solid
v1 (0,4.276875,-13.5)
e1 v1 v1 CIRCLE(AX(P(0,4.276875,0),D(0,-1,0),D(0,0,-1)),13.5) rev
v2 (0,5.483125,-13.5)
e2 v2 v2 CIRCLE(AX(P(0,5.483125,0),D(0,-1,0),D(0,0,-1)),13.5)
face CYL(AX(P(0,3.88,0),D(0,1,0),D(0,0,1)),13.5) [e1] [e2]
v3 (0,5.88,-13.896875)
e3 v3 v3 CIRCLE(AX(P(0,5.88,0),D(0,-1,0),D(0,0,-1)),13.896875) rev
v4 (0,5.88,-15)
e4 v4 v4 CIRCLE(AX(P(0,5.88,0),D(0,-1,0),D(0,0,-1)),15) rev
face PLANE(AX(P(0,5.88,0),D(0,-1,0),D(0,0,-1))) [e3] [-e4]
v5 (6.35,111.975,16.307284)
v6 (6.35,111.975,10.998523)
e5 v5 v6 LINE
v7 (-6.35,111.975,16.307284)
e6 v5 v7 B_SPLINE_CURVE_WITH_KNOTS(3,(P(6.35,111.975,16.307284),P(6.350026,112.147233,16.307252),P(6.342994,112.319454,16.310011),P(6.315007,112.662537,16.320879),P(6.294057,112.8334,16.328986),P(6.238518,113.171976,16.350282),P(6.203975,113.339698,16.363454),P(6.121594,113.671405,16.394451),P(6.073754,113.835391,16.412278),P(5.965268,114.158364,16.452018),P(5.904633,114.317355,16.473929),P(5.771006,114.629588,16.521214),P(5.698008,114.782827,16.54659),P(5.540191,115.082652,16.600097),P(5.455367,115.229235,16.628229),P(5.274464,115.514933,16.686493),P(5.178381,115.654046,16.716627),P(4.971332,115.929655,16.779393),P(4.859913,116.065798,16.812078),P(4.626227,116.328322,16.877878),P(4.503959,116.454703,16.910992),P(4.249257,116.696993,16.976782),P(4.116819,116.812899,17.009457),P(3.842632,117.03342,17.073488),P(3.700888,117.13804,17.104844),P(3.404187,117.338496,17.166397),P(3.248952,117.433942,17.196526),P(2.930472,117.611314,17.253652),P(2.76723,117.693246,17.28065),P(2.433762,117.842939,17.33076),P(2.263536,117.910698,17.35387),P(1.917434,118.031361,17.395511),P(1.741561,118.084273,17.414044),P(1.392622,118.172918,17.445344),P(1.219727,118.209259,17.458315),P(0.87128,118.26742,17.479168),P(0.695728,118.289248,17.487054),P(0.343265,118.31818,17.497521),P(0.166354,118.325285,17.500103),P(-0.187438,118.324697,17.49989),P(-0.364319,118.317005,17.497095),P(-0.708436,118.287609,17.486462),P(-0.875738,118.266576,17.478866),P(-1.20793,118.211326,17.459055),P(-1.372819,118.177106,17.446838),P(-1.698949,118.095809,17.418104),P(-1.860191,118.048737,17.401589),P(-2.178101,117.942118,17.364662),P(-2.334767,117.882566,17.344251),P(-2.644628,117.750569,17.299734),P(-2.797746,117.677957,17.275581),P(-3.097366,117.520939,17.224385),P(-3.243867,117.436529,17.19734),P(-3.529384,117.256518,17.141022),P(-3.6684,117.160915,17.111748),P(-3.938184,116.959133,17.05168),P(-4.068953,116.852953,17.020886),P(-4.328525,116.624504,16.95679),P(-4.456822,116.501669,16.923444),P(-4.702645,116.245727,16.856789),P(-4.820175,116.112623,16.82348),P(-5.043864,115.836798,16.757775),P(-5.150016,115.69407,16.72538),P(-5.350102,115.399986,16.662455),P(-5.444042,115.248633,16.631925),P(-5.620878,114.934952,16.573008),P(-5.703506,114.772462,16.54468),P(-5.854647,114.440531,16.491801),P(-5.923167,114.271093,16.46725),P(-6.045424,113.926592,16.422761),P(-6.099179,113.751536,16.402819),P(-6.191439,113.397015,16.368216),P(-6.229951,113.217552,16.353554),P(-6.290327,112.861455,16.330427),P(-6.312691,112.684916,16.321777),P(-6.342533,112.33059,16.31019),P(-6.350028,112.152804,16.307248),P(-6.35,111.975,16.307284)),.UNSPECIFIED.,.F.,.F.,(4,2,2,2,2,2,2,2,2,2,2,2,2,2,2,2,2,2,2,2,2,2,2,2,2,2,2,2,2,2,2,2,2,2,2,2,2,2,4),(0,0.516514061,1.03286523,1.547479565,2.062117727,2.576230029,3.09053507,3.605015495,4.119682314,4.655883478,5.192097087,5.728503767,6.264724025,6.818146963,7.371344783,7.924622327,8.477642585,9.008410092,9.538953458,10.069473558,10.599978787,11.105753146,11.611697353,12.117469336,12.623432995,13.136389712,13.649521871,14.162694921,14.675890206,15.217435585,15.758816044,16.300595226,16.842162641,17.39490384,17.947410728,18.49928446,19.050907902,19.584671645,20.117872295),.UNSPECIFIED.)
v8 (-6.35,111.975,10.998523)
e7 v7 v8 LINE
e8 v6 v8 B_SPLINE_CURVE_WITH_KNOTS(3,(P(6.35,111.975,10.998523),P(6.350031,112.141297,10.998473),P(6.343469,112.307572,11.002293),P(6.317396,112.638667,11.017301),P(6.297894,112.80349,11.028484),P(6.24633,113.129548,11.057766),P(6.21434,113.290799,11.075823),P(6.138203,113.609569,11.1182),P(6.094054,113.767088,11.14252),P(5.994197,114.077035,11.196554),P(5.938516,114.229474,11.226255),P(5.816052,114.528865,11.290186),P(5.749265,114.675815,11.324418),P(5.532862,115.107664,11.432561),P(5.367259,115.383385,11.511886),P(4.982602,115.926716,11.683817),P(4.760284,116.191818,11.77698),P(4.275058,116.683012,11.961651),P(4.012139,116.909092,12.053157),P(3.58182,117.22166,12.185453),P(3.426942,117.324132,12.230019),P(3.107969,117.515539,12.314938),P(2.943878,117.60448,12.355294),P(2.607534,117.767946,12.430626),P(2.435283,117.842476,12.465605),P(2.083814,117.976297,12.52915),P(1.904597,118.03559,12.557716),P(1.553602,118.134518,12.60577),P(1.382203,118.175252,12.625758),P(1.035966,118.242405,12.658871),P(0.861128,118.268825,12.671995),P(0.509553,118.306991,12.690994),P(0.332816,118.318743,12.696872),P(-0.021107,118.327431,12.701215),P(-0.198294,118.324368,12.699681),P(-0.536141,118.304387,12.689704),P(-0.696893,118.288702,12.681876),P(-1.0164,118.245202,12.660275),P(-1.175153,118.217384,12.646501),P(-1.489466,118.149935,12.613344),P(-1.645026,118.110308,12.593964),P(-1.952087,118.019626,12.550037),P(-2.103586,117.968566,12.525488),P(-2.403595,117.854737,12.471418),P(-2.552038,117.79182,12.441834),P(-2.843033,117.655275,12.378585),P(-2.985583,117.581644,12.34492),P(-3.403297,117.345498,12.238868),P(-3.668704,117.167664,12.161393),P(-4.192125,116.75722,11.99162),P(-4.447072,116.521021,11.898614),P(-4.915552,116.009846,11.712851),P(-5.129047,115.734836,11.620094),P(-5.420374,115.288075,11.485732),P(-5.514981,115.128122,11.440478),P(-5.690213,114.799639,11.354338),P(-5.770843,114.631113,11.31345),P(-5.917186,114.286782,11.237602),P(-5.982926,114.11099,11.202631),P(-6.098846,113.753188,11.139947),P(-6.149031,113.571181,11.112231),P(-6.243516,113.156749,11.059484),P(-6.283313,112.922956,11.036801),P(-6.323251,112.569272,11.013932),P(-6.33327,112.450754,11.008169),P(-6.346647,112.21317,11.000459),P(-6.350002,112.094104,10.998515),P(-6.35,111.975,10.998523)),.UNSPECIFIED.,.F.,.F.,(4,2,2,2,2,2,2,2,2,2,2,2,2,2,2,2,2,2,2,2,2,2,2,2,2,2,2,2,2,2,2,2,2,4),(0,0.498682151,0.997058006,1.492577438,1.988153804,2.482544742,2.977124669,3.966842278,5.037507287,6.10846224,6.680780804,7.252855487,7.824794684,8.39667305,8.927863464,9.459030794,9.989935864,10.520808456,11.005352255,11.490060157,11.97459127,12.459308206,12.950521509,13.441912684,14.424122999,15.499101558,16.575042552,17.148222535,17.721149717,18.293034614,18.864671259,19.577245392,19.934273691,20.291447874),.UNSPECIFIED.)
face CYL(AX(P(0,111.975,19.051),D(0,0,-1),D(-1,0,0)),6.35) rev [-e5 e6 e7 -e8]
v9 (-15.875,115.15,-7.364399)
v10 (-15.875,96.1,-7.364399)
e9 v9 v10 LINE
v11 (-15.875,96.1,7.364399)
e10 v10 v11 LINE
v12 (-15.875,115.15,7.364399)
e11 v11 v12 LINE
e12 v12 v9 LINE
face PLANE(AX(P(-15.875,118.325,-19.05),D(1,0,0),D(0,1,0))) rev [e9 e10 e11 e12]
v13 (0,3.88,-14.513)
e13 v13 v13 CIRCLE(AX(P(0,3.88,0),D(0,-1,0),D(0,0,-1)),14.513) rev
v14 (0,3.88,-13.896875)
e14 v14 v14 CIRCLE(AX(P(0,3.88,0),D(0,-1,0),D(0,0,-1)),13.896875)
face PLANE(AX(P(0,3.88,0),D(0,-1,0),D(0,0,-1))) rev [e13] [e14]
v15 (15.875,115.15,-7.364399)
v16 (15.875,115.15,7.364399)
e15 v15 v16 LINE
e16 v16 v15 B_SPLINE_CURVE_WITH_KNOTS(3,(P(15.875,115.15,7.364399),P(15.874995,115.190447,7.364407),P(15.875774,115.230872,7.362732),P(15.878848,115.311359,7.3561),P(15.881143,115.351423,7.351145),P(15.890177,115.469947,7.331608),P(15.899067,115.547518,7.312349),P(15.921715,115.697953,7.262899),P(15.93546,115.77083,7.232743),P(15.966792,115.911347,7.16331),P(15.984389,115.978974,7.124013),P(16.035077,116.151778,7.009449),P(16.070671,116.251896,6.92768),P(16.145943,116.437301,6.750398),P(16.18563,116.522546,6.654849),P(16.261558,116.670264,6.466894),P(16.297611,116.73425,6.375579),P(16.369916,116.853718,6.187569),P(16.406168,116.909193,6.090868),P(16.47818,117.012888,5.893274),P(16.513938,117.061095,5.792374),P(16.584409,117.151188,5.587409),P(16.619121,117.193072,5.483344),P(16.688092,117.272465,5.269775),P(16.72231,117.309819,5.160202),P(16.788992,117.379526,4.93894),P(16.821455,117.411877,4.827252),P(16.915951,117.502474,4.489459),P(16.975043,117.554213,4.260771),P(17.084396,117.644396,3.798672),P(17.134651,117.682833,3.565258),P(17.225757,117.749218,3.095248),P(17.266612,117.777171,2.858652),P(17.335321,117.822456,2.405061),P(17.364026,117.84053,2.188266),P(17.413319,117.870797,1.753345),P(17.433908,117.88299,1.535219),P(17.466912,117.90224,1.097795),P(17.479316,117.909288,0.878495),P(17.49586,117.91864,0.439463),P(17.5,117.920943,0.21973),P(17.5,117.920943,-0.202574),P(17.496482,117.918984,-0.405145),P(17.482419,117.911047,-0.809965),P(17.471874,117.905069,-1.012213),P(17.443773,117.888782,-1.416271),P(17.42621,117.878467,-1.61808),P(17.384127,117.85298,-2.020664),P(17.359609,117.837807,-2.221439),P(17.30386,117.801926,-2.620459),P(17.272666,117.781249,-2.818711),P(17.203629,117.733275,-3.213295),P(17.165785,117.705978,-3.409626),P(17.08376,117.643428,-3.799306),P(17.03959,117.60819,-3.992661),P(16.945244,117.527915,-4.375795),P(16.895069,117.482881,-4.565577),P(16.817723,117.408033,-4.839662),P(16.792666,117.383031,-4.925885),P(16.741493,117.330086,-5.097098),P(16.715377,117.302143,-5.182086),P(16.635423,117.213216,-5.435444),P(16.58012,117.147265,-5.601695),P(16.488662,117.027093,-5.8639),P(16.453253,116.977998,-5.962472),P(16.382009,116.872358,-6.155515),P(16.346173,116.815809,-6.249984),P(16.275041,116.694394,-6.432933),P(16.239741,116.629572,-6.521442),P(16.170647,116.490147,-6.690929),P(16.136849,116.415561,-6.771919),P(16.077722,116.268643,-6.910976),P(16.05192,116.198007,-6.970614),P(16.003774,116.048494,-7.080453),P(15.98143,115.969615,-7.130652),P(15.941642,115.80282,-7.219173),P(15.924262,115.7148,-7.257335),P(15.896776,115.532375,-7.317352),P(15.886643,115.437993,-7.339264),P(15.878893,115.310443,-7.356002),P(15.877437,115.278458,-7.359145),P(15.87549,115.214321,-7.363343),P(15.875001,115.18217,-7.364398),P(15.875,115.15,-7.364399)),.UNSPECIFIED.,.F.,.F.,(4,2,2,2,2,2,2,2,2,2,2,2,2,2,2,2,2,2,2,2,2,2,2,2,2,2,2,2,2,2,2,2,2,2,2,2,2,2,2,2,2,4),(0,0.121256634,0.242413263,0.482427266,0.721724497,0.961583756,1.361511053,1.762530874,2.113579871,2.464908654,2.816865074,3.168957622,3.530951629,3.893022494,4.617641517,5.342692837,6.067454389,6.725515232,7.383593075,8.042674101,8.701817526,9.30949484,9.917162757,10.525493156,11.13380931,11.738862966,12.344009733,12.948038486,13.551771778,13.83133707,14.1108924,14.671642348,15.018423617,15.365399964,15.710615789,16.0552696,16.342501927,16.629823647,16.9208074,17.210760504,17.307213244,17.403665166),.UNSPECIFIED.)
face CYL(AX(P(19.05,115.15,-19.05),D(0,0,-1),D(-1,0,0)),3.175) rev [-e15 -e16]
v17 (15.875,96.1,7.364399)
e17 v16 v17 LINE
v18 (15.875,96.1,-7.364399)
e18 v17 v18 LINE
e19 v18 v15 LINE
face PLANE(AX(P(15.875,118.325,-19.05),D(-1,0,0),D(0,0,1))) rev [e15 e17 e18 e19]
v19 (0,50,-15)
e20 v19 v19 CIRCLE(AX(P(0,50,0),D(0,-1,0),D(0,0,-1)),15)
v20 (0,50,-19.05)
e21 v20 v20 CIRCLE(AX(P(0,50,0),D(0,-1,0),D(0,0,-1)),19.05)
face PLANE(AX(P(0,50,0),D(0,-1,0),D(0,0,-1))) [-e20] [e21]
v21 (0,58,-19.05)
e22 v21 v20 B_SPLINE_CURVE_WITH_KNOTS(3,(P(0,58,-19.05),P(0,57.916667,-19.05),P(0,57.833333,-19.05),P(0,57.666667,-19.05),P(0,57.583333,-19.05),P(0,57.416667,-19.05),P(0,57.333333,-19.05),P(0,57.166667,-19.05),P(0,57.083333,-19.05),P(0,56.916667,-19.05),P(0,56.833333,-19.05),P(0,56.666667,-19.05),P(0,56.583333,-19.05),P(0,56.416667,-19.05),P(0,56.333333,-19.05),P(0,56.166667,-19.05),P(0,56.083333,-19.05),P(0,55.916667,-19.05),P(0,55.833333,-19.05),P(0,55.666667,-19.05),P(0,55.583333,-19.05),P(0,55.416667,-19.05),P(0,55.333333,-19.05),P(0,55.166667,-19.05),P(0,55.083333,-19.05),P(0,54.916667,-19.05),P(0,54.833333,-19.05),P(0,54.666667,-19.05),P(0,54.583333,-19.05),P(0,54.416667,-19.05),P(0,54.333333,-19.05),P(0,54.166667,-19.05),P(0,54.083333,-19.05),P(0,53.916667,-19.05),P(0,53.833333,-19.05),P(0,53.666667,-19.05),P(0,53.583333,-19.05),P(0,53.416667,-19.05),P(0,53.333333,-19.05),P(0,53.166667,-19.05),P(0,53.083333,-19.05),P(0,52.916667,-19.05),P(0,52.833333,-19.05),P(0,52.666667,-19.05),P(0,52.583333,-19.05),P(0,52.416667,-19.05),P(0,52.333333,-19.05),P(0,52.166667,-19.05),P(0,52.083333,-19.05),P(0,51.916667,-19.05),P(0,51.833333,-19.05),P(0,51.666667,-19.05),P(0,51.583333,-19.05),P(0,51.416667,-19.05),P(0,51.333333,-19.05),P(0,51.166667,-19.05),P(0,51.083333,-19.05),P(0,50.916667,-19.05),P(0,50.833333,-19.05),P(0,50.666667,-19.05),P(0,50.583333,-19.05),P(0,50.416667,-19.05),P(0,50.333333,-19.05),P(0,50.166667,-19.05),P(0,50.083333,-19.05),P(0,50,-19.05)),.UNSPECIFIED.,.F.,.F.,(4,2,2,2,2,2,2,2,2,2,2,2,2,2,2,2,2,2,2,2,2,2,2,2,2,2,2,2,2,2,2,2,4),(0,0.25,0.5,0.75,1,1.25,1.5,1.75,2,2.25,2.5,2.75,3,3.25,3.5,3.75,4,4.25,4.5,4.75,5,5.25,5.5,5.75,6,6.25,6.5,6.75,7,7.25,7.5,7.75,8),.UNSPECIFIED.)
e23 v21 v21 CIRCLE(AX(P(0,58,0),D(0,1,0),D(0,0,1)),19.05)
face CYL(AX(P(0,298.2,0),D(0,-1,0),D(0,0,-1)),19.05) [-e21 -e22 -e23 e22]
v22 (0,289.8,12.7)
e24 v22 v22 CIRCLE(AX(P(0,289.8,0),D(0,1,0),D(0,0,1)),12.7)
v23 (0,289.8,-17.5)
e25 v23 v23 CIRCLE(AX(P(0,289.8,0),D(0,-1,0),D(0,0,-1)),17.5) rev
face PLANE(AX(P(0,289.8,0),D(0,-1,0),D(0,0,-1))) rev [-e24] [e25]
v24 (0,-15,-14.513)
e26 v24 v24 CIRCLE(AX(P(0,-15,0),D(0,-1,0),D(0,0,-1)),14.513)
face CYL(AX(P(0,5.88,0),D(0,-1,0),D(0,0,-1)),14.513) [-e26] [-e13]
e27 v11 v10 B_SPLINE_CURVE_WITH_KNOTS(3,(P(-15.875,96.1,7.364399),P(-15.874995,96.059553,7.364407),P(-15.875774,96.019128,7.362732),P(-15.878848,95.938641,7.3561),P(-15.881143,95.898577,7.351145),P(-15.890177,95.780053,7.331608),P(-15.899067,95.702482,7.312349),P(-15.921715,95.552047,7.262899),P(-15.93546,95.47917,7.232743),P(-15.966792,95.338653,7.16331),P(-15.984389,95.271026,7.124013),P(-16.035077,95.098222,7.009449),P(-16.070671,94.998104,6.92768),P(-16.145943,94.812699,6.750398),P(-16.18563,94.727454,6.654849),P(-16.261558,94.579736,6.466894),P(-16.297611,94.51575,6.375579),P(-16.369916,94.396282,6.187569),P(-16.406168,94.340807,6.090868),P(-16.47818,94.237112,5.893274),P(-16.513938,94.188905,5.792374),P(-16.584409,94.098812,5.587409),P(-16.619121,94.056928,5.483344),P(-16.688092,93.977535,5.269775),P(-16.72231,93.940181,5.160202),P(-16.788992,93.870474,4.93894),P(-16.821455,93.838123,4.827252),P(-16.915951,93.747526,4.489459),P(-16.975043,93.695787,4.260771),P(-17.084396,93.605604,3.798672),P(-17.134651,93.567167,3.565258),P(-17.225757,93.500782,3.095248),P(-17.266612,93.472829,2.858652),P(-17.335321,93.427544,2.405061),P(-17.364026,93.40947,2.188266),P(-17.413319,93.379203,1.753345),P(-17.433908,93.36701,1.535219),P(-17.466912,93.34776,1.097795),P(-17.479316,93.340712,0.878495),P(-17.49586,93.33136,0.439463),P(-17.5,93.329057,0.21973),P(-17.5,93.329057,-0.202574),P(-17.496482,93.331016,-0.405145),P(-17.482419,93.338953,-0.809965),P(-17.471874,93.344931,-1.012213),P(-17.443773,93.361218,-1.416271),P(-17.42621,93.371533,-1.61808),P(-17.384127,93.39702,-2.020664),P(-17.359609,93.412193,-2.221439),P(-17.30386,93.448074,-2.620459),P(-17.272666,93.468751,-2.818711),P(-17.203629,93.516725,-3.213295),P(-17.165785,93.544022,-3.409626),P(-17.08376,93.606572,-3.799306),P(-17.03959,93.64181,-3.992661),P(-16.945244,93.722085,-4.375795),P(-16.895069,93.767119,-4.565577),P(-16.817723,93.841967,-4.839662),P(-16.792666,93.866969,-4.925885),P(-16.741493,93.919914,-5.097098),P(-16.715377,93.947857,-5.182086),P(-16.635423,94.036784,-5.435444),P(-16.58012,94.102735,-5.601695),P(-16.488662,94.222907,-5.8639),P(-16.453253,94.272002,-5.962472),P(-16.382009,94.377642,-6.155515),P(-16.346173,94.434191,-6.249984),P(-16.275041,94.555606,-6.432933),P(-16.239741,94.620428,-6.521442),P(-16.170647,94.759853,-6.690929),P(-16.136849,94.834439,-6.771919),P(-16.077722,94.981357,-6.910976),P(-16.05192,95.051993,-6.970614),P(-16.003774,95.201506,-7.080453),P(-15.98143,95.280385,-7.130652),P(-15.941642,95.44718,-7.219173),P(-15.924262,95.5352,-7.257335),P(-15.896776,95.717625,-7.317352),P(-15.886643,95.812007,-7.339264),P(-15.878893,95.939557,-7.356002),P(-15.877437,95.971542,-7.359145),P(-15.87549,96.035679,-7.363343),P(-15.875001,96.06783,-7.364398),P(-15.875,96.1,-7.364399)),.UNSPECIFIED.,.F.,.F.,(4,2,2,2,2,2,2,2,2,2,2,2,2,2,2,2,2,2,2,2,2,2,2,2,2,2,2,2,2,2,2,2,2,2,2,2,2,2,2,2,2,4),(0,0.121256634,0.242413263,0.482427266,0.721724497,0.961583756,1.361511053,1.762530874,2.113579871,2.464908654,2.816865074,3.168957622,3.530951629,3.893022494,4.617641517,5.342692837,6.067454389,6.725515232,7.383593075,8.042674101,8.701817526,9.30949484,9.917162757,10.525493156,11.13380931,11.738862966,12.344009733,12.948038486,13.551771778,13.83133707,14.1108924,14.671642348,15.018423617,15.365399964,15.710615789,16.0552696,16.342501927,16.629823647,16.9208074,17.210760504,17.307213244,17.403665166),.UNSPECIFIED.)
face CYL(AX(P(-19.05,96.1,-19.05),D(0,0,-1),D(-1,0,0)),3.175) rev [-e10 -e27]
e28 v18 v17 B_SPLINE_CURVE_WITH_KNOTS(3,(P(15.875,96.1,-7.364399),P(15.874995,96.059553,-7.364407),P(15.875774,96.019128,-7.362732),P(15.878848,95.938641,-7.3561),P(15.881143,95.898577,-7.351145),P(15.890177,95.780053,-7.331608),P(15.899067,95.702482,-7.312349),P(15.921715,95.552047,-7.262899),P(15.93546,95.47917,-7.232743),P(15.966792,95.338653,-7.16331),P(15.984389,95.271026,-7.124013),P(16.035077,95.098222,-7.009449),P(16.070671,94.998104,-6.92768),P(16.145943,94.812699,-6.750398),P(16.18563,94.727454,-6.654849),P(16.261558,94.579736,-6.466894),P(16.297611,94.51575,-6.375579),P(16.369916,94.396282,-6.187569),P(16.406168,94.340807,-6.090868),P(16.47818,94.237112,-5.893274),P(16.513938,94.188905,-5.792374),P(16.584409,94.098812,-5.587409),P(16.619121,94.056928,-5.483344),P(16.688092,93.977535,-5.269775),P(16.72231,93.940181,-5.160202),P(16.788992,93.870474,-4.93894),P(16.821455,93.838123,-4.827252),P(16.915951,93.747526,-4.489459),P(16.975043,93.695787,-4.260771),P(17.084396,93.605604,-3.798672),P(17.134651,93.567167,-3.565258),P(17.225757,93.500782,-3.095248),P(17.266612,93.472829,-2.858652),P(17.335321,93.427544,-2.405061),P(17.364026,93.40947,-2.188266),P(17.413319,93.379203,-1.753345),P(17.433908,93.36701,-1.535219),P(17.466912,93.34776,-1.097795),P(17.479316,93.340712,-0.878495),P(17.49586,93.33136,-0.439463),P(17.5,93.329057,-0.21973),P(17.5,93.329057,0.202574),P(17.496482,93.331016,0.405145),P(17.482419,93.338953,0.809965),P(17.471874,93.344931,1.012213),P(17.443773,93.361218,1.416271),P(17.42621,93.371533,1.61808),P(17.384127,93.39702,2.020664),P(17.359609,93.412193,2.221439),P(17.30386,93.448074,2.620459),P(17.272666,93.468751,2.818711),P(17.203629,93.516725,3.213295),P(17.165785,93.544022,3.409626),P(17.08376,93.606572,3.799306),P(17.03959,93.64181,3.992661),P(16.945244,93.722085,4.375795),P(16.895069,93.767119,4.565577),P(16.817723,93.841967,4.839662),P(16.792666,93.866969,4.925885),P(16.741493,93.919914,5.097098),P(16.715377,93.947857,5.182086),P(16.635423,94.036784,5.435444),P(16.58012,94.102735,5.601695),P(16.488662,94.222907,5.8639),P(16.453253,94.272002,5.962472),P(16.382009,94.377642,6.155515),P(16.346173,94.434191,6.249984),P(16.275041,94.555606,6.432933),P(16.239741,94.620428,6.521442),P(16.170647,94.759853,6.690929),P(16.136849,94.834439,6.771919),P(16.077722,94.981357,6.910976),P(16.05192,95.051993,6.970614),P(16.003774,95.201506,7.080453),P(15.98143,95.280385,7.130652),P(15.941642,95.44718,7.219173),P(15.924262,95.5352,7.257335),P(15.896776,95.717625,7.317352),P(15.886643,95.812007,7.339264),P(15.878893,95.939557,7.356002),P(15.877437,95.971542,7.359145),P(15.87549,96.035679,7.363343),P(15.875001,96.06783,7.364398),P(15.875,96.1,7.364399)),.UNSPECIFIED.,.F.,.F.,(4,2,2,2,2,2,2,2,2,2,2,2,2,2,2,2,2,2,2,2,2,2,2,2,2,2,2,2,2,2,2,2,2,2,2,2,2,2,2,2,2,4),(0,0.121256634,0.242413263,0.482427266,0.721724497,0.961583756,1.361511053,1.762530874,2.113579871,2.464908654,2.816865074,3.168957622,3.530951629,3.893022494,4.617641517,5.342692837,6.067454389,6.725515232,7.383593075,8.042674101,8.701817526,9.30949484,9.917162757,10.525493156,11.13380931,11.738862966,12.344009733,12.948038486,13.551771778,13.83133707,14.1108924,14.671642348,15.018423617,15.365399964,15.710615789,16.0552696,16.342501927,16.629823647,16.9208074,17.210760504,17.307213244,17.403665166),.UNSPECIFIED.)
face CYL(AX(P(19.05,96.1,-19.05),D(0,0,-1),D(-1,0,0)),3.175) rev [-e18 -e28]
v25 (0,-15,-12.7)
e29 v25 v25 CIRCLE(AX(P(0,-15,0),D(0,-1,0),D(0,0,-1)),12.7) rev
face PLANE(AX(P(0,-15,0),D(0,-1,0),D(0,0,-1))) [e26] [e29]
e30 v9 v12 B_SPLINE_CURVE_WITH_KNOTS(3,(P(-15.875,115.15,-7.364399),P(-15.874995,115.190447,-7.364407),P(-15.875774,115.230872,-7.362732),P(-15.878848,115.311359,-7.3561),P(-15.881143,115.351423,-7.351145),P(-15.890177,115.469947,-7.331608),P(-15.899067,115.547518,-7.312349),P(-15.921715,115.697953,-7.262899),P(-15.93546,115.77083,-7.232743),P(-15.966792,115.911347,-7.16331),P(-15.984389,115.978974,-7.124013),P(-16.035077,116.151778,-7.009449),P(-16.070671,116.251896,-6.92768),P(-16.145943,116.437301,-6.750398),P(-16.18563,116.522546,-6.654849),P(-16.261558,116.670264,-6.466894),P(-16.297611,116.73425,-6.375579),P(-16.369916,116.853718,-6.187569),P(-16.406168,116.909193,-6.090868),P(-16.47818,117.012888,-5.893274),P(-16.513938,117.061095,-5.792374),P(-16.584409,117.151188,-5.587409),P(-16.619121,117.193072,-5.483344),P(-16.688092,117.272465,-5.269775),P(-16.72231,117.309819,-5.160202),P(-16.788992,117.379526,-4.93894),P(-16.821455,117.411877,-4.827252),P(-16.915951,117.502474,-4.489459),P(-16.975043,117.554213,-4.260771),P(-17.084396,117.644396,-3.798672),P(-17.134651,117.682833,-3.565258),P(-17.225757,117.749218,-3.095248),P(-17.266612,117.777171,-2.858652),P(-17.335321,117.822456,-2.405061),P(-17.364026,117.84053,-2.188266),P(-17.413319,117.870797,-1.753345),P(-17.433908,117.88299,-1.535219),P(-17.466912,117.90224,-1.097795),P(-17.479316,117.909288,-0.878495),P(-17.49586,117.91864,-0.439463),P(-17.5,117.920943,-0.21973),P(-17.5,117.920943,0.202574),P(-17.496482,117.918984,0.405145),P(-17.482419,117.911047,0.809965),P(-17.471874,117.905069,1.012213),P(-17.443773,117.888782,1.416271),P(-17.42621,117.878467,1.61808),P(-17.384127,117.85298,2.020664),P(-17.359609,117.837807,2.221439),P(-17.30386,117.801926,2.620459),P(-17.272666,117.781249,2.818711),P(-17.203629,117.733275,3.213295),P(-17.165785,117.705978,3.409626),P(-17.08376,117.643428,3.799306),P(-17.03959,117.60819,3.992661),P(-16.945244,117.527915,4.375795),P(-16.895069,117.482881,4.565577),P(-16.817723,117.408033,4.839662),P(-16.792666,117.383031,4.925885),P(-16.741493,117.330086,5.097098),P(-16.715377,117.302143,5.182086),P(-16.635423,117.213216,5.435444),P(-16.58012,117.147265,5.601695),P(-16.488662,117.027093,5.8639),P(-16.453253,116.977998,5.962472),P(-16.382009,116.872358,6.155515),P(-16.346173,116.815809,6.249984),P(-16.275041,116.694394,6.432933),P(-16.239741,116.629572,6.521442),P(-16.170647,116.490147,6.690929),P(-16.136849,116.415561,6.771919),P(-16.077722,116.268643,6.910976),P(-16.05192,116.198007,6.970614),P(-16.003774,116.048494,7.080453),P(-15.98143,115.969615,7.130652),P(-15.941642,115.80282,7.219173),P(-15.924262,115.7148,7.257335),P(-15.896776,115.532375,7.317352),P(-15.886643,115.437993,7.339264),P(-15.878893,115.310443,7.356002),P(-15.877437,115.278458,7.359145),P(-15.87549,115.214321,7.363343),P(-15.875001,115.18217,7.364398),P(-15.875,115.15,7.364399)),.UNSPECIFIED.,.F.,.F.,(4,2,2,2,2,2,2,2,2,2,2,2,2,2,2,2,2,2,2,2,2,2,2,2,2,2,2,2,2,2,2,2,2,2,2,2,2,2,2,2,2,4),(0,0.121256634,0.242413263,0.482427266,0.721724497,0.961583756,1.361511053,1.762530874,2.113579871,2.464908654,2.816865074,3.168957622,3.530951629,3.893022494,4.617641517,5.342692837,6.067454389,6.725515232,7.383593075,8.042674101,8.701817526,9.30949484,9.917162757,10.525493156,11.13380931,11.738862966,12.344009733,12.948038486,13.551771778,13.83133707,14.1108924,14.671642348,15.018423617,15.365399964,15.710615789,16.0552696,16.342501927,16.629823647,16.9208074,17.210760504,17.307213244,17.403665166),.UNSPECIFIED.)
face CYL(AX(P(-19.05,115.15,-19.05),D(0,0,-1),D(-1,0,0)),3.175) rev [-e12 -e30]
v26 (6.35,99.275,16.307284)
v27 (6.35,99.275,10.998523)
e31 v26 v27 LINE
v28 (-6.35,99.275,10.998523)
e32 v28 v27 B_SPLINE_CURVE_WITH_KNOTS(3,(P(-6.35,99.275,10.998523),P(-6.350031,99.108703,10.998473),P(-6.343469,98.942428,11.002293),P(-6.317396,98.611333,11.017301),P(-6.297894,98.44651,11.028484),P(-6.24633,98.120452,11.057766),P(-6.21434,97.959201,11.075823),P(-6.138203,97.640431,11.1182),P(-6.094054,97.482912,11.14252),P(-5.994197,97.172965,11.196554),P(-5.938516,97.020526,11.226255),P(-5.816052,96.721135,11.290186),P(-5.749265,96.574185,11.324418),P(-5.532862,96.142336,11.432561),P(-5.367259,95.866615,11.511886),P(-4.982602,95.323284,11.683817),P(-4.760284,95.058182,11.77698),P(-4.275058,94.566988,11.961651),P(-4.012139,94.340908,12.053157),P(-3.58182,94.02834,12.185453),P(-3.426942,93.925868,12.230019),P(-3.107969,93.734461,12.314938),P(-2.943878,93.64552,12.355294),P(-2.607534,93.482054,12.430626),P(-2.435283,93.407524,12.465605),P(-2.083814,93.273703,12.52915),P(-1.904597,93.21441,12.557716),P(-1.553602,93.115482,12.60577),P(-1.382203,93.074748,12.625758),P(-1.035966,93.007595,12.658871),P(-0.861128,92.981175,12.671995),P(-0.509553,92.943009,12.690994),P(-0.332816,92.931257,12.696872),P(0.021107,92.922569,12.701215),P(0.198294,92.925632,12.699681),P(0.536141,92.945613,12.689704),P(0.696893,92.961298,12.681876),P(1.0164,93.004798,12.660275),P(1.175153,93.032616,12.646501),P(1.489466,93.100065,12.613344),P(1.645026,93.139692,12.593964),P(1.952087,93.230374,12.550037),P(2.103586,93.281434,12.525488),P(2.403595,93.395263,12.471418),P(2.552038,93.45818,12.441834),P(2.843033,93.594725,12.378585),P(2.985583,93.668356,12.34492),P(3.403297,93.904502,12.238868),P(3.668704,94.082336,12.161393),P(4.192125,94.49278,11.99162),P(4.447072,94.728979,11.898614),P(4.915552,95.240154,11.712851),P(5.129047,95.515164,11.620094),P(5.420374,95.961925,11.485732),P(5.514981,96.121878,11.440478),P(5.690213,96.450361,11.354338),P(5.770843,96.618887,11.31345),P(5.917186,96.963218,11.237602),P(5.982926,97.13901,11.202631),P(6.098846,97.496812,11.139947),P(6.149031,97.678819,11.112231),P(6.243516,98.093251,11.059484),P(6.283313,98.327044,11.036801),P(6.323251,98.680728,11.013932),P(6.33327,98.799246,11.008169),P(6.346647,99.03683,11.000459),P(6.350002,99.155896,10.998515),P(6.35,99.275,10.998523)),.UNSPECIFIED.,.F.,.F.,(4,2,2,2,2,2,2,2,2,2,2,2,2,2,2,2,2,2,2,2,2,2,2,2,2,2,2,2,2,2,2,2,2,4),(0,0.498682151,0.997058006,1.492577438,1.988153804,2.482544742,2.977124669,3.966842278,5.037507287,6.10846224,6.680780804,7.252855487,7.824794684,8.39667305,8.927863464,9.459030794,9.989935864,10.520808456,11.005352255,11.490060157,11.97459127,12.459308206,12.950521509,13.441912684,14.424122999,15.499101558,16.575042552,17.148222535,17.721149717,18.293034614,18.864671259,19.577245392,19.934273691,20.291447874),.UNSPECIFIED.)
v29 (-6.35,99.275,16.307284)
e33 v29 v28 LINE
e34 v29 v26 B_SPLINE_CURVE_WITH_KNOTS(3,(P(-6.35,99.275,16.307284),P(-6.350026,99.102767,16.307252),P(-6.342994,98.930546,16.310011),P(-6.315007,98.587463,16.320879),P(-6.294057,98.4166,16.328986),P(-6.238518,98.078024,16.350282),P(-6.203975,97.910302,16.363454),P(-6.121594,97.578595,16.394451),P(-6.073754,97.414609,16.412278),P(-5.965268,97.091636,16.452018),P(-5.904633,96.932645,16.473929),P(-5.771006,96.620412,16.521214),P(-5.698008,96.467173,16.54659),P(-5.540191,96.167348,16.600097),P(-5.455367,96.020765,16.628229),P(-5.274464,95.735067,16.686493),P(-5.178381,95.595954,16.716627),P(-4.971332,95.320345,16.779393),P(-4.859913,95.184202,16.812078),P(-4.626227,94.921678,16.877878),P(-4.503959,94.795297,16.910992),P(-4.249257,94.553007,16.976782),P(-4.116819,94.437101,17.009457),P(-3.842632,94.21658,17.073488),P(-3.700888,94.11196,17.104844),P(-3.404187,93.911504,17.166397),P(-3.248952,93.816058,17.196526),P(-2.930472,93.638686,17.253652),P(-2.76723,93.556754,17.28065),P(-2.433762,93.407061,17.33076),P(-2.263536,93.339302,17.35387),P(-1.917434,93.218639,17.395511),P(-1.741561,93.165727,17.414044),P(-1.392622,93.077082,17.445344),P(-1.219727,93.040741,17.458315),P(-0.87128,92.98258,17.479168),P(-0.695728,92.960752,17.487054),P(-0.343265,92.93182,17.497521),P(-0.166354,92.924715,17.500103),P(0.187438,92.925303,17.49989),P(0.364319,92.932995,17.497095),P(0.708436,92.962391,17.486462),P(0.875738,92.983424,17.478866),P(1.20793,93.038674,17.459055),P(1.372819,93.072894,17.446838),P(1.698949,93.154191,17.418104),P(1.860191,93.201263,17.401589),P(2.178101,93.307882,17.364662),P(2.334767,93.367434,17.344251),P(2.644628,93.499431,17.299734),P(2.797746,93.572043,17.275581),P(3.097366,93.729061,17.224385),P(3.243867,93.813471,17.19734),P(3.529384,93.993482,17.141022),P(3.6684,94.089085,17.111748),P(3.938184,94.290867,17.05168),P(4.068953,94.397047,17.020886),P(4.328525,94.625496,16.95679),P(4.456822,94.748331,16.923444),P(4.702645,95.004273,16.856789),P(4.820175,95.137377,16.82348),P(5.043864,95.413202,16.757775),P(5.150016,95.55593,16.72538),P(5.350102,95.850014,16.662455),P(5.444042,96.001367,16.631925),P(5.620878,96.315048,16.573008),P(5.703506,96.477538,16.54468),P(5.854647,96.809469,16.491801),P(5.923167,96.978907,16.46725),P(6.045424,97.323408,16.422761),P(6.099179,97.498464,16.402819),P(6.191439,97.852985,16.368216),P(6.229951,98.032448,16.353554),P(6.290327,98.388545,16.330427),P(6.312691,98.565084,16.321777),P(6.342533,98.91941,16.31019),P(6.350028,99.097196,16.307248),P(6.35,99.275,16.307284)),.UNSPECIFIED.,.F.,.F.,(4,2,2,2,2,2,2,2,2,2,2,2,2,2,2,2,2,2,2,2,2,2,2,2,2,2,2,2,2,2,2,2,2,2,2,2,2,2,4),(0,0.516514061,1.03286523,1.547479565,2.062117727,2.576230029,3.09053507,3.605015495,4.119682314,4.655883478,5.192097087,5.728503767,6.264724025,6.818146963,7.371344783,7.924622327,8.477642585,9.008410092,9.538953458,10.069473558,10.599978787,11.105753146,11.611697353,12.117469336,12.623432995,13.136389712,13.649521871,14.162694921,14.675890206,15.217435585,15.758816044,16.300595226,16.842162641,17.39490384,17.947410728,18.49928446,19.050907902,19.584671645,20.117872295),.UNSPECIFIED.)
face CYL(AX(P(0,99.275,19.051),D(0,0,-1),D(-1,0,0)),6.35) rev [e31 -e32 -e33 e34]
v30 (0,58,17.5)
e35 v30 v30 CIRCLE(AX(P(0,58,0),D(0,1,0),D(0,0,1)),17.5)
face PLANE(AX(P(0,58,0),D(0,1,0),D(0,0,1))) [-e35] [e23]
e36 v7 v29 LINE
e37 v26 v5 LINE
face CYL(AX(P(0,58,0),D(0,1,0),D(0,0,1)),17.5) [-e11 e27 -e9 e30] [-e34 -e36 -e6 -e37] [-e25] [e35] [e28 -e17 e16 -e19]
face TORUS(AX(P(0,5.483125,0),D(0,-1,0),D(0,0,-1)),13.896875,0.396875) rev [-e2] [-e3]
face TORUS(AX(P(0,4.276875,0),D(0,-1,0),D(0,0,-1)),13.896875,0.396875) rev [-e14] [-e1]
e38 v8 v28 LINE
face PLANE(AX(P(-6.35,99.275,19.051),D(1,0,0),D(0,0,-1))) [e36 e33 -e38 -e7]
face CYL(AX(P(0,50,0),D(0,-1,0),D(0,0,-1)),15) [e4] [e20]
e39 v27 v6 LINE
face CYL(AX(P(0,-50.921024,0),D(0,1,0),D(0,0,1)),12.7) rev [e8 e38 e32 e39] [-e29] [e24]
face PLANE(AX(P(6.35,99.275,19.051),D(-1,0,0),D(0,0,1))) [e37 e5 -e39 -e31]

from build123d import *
from build123d.topology import SkipClean

# Parameters (mm, degrees)
SKETCH1_R               = 22.5
SKETCH1_R_2             = 9.525
BOSS_EXTRUDE1_DEPTH     = 95
SKETCH2_OUTSIDE_W       = 69.87
SKETCH2_OUTSIDE_H       = 69.87
SKETCH2_OUTSIDE_R       = 15
CUT_EXTRUDE1_DEPTH      = 50
SKETCH4_OUTSIDE_W       = 69.87
SKETCH4_OUTSIDE_H       = 69.87
SKETCH4_OUTSIDE_R       = 17.5
CUT_EXTRUDE2_DEPTH      = 37
SKETCH11_OUTSIDE_W      = 69.87
SKETCH11_OUTSIDE_H      = 69.87
SKETCH11_OUTSIDE_R      = 14.513
CUT_EXTRUDE3_DEPTH      = 5.88
SKETCH12_R              = 17.5
SKETCH12_R_2            = 9.525
BOSS_EXTRUDE2_DEPTH     = 203.2
BOSS_EXTRUDE3_START     = 15
SKETCH13_R              = 14.513
SKETCH13_R_2            = 9.525
BOSS_EXTRUDE3_DEPTH     = 15
SKETCH15_OUTSIDE_W      = 110.92
SKETCH15_OUTSIDE_H      = 110.92
SKETCH15_OUTSIDE_R      = 19.05
CUT_EXTRUDE5_DEPTH      = 251.231372933
SKETCH16_OUTSIDE_W      = 103.66
SKETCH16_OUTSIDE_H      = 103.66
SKETCH16_OUTSIDE_R      = 13.5
CUT_EXTRUDE6_DEPTH      = 2
FILLET2_R               = 0.396875
SKETCH17_R              = 17.5
CUT_EXTRUDE7_DEPTH      = 8.4
CUT_EXTRUDE8_DEPTH      = 292.049557636
CUT_EXTRUDE8_DEPTH_BACK = 292.049557636
SKETCH20_W              = 3.175
SKETCH20_H              = 25.4
FILLET3_R               = 3.175
CUT_EXTRUDE9_REACH      = 293.05
CUT_EXTRUDE9_END_RADIUS = 17.5
CUT_EXTRUDE10_REACH     = 307.988
SKETCH22_R              = 12.7


with BuildPart() as part:
    # Sketch1 → Boss-Extrude1 (new body)
    with BuildSketch(Plane(origin=(0, 0, 0), x_dir=(1, 0, 0), z_dir=(0, 1, 0))):
        with Locations(Location((0, 0, 0), (0, 0, 270))):
            Circle(SKETCH1_R)
        with Locations(Location((0, 0, 0), (0, 0, 270))):
            Circle(SKETCH1_R_2, mode=Mode.SUBTRACT)
    extrude(amount=BOSS_EXTRUDE1_DEPTH)

    # Sketch2 outside → Cut-Extrude1 (cut)
    with BuildSketch(Plane.XZ):
        Rectangle(SKETCH2_OUTSIDE_W, SKETCH2_OUTSIDE_H)
        with Locations(Location((0, 0, 0), (0, 0, 270))):
            Circle(SKETCH2_OUTSIDE_R, mode=Mode.SUBTRACT)
    extrude(amount=-CUT_EXTRUDE1_DEPTH, mode=Mode.SUBTRACT)

    # Sketch4 outside → Cut-Extrude2 (cut)
    with BuildSketch(Plane(origin=(0, 95, 0), x_dir=(1, 0, 0), z_dir=(0, 1, 0))):
        Rectangle(SKETCH4_OUTSIDE_W, SKETCH4_OUTSIDE_H)
        with Locations(Location((0, 0, 0), (0, 0, 270))):
            Circle(SKETCH4_OUTSIDE_R, mode=Mode.SUBTRACT)
    extrude(amount=-CUT_EXTRUDE2_DEPTH, mode=Mode.SUBTRACT)

    # Sketch11 outside → Cut-Extrude3 (cut)
    with BuildSketch(Plane.XZ):
        Rectangle(SKETCH11_OUTSIDE_W, SKETCH11_OUTSIDE_H)
        with Locations(Location((0, 0, 0), (0, 0, 270))):
            Circle(SKETCH11_OUTSIDE_R, mode=Mode.SUBTRACT)
    extrude(amount=-CUT_EXTRUDE3_DEPTH, mode=Mode.SUBTRACT)

    # Sketch12 → Boss-Extrude2 (add)
    with BuildSketch(Plane(origin=(0, 95, 0), x_dir=(1, 0, 0), z_dir=(0, 1, 0))):
        with Locations(Location((0, 0, 0), (0, 0, 270))):
            Circle(SKETCH12_R)
        with Locations(Location((0, 0, 0), (0, 0, 270))):
            Circle(SKETCH12_R_2, mode=Mode.SUBTRACT)
    extrude(amount=BOSS_EXTRUDE2_DEPTH)

    # Sketch13 → Boss-Extrude3 (add)
    with SkipClean():  # the faces are left unmerged after this step: merging them gives an invalid solid
        with BuildSketch(Plane.XZ.offset(BOSS_EXTRUDE3_START)):
            with Locations(Location((0, 0, 0), (0, 0, 270))):
                Circle(SKETCH13_R)
            with Locations(Location((0, 0, 0), (0, 0, 270))):
                Circle(SKETCH13_R_2, mode=Mode.SUBTRACT)
        extrude(amount=-BOSS_EXTRUDE3_DEPTH)

    # Sketch15 outside → Cut-Extrude5 (cut, through all)
    with SkipClean():  # the faces are left unmerged after this step: merging them gives an invalid solid
        with BuildSketch(Plane.XZ.offset(-50)):
            Rectangle(SKETCH15_OUTSIDE_W, SKETCH15_OUTSIDE_H)
            with Locations(Location((0, 0, 0), (0, 0, 270))):
                Circle(SKETCH15_OUTSIDE_R, mode=Mode.SUBTRACT)
        extrude(amount=-CUT_EXTRUDE5_DEPTH, mode=Mode.SUBTRACT)

    # Sketch16 outside → Cut-Extrude6 (cut)
    with SkipClean():  # the faces are left unmerged after this step: merging them gives an invalid solid
        with BuildSketch(Plane.XZ.offset(-5.88)):
            Rectangle(SKETCH16_OUTSIDE_W, SKETCH16_OUTSIDE_H)
            with Locations(Location((0, 0, 0), (0, 0, 270))):
                Circle(SKETCH16_OUTSIDE_R, mode=Mode.SUBTRACT)
        extrude(amount=CUT_EXTRUDE6_DEPTH, mode=Mode.SUBTRACT)

    # Fillet2
    fillet2_edges = [part.edges().sort_by_distance(p)[0] for p in [
        (0, 5.88, 13.5),
        (0, 3.88, 13.5),
    ]]
    fillet(fillet2_edges, radius=FILLET2_R)

    # Sketch17 → Cut-Extrude7 (cut)
    with BuildSketch(Plane(origin=(0, 298.2, 0), x_dir=(1, 0, 0), z_dir=(0, 1, 0))):
        with Locations(Location((0, 0, 0), (0, 0, 270))):
            Circle(SKETCH17_R)
    extrude(amount=-CUT_EXTRUDE7_DEPTH, mode=Mode.SUBTRACT)

    # Sketch20 → Cut-Extrude8 (cut, two sides: drawn at the far end of the back side and taken through both)
    with BuildSketch(Plane.XY.offset(-CUT_EXTRUDE8_DEPTH_BACK)):
        with Locations((-17.4625, 105.625)):
            Rectangle(SKETCH20_W, SKETCH20_H)
        with Locations((17.4625, 105.625)):
            Rectangle(SKETCH20_W, SKETCH20_H)
    extrude(amount=CUT_EXTRUDE8_DEPTH + CUT_EXTRUDE8_DEPTH_BACK, mode=Mode.SUBTRACT)

    # Fillet3
    # the kernel refuses this fillet: 3.175 mm, written as the material it adds along each edge
    with BuildSketch(Plane(origin=(-15.875, 92.925, 15.301899161), x_dir=(0, 1, 0), z_dir=(0, 0, -1))) as fillet3_piece_1_section:
        with BuildLine():
            CenterArc((FILLET3_R, -FILLET3_R), FILLET3_R, 90, 90)
            Line((0, -FILLET3_R), (0, 0))
            Line((0, 0), (FILLET3_R, 0))
        make_face()
    fillet3_piece_1 = extrude(amount=30.603798322, mode=Mode.PRIVATE)
    fillet3_piece_1 = fillet3_piece_1 & Plane(origin=(0, 93.819377515, 0), x_dir=(0, 0, 1), z_dir=(0, 1, 0)) * Cylinder(17.5, 74, mode=Mode.PRIVATE)
    add(fillet3_piece_1)
    with BuildSketch(Plane(origin=(-15.875, 118.325, 15.301899161), x_dir=(0, -1, 0), z_dir=(0, 0, -1))) as fillet3_piece_2_section:
        with BuildLine():
            CenterArc((FILLET3_R, FILLET3_R), FILLET3_R, 180, 90)
            Line((0, FILLET3_R), (0, 0))
            Line((0, 0), (FILLET3_R, 0))
        make_face()
    fillet3_piece_2 = extrude(amount=30.603798322, mode=Mode.PRIVATE)
    fillet3_piece_2 = fillet3_piece_2 & Plane(origin=(0, 117.430622485, 0), x_dir=(0, 0, 1), z_dir=(0, 1, 0)) * Cylinder(17.5, 74, mode=Mode.PRIVATE)
    add(fillet3_piece_2)
    with BuildSketch(Plane(origin=(15.875, 92.925, -15.301899161), x_dir=(0, 1, 0), z_dir=(0, 0, 1))) as fillet3_piece_3_section:
        with BuildLine():
            CenterArc((FILLET3_R, -FILLET3_R), FILLET3_R, 90, 90)
            Line((0, -FILLET3_R), (0, 0))
            Line((0, 0), (FILLET3_R, 0))
        make_face()
    fillet3_piece_3 = extrude(amount=30.603798322, mode=Mode.PRIVATE)
    fillet3_piece_3 = fillet3_piece_3 & Plane(origin=(0, 93.81935464, 0), x_dir=(0, 0, 1), z_dir=(0, 1, 0)) * Cylinder(17.5, 74, mode=Mode.PRIVATE)
    add(fillet3_piece_3)
    with BuildSketch(Plane(origin=(15.875, 118.325, -15.301899161), x_dir=(0, -1, 0), z_dir=(0, 0, 1))) as fillet3_piece_4_section:
        with BuildLine():
            CenterArc((FILLET3_R, FILLET3_R), FILLET3_R, 180, 90)
            Line((0, FILLET3_R), (0, 0))
            Line((0, 0), (FILLET3_R, 0))
        make_face()
    fillet3_piece_4 = extrude(amount=30.603798322, mode=Mode.PRIVATE)
    fillet3_piece_4 = fillet3_piece_4 & Plane(origin=(0, 117.43064536, 0), x_dir=(0, 0, 1), z_dir=(0, 1, 0)) * Cylinder(17.5, 74, mode=Mode.PRIVATE)
    add(fillet3_piece_4)

    # Cut-Extrude9: up to this cylinder (the profile starts inside it)
    cut_extrude9_end = Plane(origin=(0, 105.625, 0), z_dir=(0, 1, 0)) * Cylinder(CUT_EXTRUDE9_END_RADIUS, 622.1, mode=Mode.PRIVATE)
    # Sketch21 → Cut-Extrude9 (cut, up to the surface)
    with BuildSketch(Plane.XY, mode=Mode.PRIVATE) as cut_extrude9_sk1:
        with BuildLine():
            Line((-6.35, 99.275), (-6.35, 111.975))
            ThreePointArc((-6.35, 111.975), (0, 118.325), (6.35, 111.975))
            Line((6.35, 111.975), (6.35, 99.275))
            ThreePointArc((6.35, 99.275), (0, 92.925), (-6.35, 99.275))
        make_face()
    cut_extrude9_tool1 = extrude(cut_extrude9_sk1.sketch, amount=CUT_EXTRUDE9_REACH, mode=Mode.PRIVATE) & cut_extrude9_end
    add(cut_extrude9_tool1.solids().sort_by_distance((0, 105.625, 0))[0], mode=Mode.SUBTRACT)

    # Cut-Extrude10: up to this face of the body (flat: up to its plane)
    cut_extrude10_end = Plane(part.part.faces().sort_by_distance((0, -15, 14.102510371))[0])
    # Sketch22 → Cut-Extrude10 (cut, up to the picked face)
    with BuildSketch(Plane(origin=(0, 289.8, 0), x_dir=(1, 0, 0), z_dir=(0, 1, 0)), mode=Mode.PRIVATE) as cut_extrude10_sk1:
        with Locations(Location((0, 0, 0), (0, 0, 270))):
            Circle(SKETCH22_R)
    cut_extrude10_tool1 = split(extrude(cut_extrude10_sk1.sketch, amount=-CUT_EXTRUDE10_REACH, mode=Mode.PRIVATE), bisect_by=cut_extrude10_end, keep=Keep.BOTH, mode=Mode.PRIVATE)
    add(cut_extrude10_tool1.solids().sort_by(Axis((0, 289.8, 0), (0, -1, 0)))[0], mode=Mode.SUBTRACT)


solid = part.part
